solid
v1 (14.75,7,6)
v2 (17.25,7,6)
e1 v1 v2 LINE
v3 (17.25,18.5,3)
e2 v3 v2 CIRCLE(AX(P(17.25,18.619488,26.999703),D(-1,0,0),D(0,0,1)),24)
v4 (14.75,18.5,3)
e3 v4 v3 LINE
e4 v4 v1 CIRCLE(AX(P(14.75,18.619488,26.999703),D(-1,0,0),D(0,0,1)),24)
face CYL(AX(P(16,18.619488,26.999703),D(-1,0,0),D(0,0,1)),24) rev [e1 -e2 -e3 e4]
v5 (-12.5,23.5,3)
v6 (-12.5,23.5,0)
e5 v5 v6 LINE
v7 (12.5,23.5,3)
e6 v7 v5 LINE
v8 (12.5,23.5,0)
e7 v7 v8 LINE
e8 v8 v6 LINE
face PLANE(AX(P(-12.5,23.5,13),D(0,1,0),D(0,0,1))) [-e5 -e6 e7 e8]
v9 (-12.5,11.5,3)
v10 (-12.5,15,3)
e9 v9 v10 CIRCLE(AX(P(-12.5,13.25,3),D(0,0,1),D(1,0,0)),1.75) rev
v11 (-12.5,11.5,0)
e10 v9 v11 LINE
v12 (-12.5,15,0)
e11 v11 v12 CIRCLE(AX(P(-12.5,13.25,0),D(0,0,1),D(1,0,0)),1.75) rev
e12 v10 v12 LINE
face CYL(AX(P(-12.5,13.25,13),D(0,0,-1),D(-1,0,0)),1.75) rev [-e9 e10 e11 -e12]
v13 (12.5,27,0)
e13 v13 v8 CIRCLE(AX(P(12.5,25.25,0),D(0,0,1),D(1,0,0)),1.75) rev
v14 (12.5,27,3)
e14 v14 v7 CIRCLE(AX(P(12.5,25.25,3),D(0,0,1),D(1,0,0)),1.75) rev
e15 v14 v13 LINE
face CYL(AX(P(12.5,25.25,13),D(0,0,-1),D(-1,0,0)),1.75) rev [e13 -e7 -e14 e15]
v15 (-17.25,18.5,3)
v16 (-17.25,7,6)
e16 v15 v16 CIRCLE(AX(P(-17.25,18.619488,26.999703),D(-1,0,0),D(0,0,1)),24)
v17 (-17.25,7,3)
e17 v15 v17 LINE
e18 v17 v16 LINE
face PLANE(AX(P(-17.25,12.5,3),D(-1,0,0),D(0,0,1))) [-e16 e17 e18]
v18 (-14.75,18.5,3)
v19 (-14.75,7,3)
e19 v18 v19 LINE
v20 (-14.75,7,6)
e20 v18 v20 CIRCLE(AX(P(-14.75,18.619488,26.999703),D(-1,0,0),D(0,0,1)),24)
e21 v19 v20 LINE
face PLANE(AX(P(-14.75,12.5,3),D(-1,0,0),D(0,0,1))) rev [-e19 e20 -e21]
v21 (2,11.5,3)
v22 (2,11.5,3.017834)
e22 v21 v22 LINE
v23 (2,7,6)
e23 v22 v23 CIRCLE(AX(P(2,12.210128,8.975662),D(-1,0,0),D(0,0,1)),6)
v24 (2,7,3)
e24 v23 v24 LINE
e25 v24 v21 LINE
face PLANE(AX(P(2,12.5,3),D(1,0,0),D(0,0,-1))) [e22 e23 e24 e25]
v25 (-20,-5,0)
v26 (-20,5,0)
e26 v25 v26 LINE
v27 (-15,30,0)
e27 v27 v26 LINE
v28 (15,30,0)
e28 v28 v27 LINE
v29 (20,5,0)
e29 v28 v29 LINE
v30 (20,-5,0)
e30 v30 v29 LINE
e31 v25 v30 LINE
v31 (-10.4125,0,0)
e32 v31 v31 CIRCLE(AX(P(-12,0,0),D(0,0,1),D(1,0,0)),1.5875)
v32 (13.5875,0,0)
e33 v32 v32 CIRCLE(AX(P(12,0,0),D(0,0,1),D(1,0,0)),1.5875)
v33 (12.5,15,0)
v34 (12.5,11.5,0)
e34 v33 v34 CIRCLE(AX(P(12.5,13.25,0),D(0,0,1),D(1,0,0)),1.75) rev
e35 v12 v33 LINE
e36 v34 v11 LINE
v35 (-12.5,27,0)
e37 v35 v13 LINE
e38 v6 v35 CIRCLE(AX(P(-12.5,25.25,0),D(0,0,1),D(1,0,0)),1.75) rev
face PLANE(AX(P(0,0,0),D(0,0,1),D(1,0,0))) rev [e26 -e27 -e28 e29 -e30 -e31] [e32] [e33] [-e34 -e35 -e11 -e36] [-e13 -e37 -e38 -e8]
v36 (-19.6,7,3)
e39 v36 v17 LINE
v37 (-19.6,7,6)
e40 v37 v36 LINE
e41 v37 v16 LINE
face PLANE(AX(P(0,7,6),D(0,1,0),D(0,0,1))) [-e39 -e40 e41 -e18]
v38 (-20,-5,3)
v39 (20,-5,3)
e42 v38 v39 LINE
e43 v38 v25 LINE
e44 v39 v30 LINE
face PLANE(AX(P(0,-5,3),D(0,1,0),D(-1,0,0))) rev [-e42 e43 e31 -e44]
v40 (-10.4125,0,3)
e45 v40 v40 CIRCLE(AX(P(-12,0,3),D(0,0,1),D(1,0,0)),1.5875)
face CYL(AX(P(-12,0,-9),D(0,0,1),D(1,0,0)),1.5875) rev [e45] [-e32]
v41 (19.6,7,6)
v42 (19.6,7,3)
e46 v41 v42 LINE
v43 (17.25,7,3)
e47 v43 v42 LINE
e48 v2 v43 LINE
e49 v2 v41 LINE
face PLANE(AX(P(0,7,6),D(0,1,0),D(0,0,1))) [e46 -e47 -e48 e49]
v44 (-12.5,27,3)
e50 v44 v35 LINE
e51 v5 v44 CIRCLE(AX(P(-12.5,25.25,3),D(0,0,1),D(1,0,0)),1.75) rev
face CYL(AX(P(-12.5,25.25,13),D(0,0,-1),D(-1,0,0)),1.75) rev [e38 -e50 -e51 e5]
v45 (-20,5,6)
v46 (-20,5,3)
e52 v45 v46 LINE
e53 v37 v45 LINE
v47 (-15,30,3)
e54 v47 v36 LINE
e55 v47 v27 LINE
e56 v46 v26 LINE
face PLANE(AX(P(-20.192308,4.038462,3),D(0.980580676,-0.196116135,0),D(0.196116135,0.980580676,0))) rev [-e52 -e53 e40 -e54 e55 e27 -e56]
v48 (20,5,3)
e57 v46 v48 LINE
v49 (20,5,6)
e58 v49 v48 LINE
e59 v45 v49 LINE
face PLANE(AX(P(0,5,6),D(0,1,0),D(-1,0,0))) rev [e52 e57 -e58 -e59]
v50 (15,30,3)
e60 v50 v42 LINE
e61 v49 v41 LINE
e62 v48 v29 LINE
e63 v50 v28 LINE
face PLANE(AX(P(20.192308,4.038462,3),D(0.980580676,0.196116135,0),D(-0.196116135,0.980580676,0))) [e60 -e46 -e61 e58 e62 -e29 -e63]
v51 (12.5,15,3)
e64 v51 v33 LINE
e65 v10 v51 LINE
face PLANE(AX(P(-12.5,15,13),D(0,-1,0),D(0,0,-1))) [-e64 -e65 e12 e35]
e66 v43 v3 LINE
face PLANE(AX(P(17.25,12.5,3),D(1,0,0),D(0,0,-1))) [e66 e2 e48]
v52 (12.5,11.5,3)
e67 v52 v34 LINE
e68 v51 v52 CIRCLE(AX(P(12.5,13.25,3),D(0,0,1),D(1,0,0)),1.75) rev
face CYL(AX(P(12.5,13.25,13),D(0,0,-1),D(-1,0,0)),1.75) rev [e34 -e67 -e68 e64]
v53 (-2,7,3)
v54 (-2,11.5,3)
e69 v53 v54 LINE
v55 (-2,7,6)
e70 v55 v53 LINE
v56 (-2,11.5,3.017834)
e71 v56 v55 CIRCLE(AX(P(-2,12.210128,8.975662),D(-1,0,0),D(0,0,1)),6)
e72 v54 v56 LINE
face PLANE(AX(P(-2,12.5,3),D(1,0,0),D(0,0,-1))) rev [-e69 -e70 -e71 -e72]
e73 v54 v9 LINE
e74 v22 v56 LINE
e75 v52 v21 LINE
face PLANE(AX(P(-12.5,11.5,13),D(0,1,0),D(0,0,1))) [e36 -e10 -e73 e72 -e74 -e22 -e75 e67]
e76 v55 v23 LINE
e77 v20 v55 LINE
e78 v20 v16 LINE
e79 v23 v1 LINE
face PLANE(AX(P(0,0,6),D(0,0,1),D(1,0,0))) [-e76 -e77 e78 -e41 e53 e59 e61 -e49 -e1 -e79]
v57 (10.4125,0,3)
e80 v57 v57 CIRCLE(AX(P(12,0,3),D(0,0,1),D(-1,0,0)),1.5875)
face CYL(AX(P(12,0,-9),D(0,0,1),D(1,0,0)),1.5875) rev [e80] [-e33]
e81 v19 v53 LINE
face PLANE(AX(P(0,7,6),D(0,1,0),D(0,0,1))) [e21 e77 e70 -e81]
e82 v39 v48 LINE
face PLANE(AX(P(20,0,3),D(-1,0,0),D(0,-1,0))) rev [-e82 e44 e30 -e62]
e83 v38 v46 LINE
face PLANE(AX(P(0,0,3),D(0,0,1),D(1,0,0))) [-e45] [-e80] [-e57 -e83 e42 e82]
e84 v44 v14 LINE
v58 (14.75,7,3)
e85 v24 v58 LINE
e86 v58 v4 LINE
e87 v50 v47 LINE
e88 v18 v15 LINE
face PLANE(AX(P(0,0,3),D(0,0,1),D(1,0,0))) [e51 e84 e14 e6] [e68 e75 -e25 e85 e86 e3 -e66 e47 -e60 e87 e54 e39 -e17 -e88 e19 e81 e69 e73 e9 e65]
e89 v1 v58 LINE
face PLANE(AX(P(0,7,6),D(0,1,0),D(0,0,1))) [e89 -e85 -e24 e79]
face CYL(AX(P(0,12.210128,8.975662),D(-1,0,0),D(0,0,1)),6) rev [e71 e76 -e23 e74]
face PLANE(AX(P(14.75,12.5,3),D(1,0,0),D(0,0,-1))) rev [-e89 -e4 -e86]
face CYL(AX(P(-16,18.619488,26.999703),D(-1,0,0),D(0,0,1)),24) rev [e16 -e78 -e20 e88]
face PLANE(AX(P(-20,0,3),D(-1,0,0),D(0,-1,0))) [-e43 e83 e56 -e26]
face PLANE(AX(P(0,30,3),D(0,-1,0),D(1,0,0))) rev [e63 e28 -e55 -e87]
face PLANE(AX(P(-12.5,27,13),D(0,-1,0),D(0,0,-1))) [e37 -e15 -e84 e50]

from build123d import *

# Parameters (mm, degrees)
SALIENTE_EXTRUIR1_DEPTH    = 3
SALIENTE_EXTRUIR2_DEPTH    = 3
NERVIO6_START              = -1.25
NERVIO6_DEPTH              = 2.5
NERVIO7_START              = -2
NERVIO7_DEPTH              = 4
CROQUIS3_R                 = 1.5875
CORTAR_EXTRUIR1_DEPTH      = 12
CORTAR_EXTRUIR2_DEPTH      = 10
CORTAR_EXTRUIR2_DEPTH_BACK = 12


# Read off the part's stored shape, not the designer's step: Nervio6, Nervio7
with BuildPart() as part:
    # Croquis1 → Saliente-Extruir1 (new body)
    with BuildSketch(Plane.XY):
        Polygon((-20, 5), (-20, -5), (20, -5), (20, 5), (0, 5), align=None)
        Polygon((-15, 30), (-20, 5), (0, 5), (0, 30), align=None)
        Polygon((0, 5), (20, 5), (15, 30), (0, 30), align=None)
    extrude(amount=SALIENTE_EXTRUIR1_DEPTH)

    # Croquis2 → Saliente-Extruir2 (add)
    with BuildSketch(Plane.XY.offset(3)):
        Polygon((-19.6, 7), (-20, 5), (20, 5), (19.6, 7), align=None)
    extrude(amount=SALIENTE_EXTRUIR2_DEPTH)

    # Nervio6 outline → Nervio6 (add)
    with BuildSketch(Plane(origin=(16, 0, 0), x_dir=(0, 0, -1), z_dir=(1, 0, 0)).offset(NERVIO6_START)):
        with BuildLine():
            Line((-3, 7), (-3, 18.5))
            ThreePointArc((-3, 18.5), (-3.776888017, 12.561362091), (-6, 7))
            Line((-6, 7), (-3, 7))
        make_face()
    nervio6 = extrude(amount=NERVIO6_DEPTH)

    # Simetría2: Nervio6 across plane
    add(nervio6.mirror(Plane(origin=(0, 0, 0), x_dir=(0, 0, 1), z_dir=(1, 0, 0))))

    # Nervio7 outline → Nervio7 (add)
    with BuildSketch(Plane(origin=(0, 0, 0), x_dir=(0, 0, -1), z_dir=(1, 0, 0)).offset(NERVIO7_START)):
        with BuildLine():
            Line((-3, 7), (-3, 11.670256173))
            ThreePointArc((-3, 11.670256173), (-3.927457039, 8.967347644), (-6, 7))
            Line((-6, 7), (-3, 7))
        make_face()
    extrude(amount=NERVIO7_DEPTH)

    # Croquis3 → Cortar-Extruir1 (cut)
    with BuildSketch(Plane.XY.offset(3)):
        with Locations((-12, 0)):
            Circle(CROQUIS3_R)
        with Locations((12, 0)):
            Circle(CROQUIS3_R)
    extrude(amount=-CORTAR_EXTRUIR1_DEPTH, mode=Mode.SUBTRACT)

    # Croquis4 → Cortar-Extruir2 (cut, two sides: drawn at the far end of the back side and taken through both)
    with BuildSketch(Plane.XY.offset(3).offset(-CORTAR_EXTRUIR2_DEPTH_BACK)):
        with BuildLine():
            Line((-12.5, 27), (12.5, 27))
            ThreePointArc((12.5, 27), (14.25, 25.25), (12.5, 23.5))
            Line((12.5, 23.5), (-12.5, 23.5))
            ThreePointArc((-12.5, 23.5), (-14.25, 25.25), (-12.5, 27))
        make_face()
        with BuildLine():
            Line((-12.5, 11.5), (12.5, 11.5))
            ThreePointArc((12.5, 11.5), (14.25, 13.25), (12.5, 15))
            Line((12.5, 15), (-12.5, 15))
            ThreePointArc((-12.5, 15), (-14.25, 13.25), (-12.5, 11.5))
        make_face()
    extrude(amount=CORTAR_EXTRUIR2_DEPTH + CORTAR_EXTRUIR2_DEPTH_BACK, mode=Mode.SUBTRACT)


solid = part.part
